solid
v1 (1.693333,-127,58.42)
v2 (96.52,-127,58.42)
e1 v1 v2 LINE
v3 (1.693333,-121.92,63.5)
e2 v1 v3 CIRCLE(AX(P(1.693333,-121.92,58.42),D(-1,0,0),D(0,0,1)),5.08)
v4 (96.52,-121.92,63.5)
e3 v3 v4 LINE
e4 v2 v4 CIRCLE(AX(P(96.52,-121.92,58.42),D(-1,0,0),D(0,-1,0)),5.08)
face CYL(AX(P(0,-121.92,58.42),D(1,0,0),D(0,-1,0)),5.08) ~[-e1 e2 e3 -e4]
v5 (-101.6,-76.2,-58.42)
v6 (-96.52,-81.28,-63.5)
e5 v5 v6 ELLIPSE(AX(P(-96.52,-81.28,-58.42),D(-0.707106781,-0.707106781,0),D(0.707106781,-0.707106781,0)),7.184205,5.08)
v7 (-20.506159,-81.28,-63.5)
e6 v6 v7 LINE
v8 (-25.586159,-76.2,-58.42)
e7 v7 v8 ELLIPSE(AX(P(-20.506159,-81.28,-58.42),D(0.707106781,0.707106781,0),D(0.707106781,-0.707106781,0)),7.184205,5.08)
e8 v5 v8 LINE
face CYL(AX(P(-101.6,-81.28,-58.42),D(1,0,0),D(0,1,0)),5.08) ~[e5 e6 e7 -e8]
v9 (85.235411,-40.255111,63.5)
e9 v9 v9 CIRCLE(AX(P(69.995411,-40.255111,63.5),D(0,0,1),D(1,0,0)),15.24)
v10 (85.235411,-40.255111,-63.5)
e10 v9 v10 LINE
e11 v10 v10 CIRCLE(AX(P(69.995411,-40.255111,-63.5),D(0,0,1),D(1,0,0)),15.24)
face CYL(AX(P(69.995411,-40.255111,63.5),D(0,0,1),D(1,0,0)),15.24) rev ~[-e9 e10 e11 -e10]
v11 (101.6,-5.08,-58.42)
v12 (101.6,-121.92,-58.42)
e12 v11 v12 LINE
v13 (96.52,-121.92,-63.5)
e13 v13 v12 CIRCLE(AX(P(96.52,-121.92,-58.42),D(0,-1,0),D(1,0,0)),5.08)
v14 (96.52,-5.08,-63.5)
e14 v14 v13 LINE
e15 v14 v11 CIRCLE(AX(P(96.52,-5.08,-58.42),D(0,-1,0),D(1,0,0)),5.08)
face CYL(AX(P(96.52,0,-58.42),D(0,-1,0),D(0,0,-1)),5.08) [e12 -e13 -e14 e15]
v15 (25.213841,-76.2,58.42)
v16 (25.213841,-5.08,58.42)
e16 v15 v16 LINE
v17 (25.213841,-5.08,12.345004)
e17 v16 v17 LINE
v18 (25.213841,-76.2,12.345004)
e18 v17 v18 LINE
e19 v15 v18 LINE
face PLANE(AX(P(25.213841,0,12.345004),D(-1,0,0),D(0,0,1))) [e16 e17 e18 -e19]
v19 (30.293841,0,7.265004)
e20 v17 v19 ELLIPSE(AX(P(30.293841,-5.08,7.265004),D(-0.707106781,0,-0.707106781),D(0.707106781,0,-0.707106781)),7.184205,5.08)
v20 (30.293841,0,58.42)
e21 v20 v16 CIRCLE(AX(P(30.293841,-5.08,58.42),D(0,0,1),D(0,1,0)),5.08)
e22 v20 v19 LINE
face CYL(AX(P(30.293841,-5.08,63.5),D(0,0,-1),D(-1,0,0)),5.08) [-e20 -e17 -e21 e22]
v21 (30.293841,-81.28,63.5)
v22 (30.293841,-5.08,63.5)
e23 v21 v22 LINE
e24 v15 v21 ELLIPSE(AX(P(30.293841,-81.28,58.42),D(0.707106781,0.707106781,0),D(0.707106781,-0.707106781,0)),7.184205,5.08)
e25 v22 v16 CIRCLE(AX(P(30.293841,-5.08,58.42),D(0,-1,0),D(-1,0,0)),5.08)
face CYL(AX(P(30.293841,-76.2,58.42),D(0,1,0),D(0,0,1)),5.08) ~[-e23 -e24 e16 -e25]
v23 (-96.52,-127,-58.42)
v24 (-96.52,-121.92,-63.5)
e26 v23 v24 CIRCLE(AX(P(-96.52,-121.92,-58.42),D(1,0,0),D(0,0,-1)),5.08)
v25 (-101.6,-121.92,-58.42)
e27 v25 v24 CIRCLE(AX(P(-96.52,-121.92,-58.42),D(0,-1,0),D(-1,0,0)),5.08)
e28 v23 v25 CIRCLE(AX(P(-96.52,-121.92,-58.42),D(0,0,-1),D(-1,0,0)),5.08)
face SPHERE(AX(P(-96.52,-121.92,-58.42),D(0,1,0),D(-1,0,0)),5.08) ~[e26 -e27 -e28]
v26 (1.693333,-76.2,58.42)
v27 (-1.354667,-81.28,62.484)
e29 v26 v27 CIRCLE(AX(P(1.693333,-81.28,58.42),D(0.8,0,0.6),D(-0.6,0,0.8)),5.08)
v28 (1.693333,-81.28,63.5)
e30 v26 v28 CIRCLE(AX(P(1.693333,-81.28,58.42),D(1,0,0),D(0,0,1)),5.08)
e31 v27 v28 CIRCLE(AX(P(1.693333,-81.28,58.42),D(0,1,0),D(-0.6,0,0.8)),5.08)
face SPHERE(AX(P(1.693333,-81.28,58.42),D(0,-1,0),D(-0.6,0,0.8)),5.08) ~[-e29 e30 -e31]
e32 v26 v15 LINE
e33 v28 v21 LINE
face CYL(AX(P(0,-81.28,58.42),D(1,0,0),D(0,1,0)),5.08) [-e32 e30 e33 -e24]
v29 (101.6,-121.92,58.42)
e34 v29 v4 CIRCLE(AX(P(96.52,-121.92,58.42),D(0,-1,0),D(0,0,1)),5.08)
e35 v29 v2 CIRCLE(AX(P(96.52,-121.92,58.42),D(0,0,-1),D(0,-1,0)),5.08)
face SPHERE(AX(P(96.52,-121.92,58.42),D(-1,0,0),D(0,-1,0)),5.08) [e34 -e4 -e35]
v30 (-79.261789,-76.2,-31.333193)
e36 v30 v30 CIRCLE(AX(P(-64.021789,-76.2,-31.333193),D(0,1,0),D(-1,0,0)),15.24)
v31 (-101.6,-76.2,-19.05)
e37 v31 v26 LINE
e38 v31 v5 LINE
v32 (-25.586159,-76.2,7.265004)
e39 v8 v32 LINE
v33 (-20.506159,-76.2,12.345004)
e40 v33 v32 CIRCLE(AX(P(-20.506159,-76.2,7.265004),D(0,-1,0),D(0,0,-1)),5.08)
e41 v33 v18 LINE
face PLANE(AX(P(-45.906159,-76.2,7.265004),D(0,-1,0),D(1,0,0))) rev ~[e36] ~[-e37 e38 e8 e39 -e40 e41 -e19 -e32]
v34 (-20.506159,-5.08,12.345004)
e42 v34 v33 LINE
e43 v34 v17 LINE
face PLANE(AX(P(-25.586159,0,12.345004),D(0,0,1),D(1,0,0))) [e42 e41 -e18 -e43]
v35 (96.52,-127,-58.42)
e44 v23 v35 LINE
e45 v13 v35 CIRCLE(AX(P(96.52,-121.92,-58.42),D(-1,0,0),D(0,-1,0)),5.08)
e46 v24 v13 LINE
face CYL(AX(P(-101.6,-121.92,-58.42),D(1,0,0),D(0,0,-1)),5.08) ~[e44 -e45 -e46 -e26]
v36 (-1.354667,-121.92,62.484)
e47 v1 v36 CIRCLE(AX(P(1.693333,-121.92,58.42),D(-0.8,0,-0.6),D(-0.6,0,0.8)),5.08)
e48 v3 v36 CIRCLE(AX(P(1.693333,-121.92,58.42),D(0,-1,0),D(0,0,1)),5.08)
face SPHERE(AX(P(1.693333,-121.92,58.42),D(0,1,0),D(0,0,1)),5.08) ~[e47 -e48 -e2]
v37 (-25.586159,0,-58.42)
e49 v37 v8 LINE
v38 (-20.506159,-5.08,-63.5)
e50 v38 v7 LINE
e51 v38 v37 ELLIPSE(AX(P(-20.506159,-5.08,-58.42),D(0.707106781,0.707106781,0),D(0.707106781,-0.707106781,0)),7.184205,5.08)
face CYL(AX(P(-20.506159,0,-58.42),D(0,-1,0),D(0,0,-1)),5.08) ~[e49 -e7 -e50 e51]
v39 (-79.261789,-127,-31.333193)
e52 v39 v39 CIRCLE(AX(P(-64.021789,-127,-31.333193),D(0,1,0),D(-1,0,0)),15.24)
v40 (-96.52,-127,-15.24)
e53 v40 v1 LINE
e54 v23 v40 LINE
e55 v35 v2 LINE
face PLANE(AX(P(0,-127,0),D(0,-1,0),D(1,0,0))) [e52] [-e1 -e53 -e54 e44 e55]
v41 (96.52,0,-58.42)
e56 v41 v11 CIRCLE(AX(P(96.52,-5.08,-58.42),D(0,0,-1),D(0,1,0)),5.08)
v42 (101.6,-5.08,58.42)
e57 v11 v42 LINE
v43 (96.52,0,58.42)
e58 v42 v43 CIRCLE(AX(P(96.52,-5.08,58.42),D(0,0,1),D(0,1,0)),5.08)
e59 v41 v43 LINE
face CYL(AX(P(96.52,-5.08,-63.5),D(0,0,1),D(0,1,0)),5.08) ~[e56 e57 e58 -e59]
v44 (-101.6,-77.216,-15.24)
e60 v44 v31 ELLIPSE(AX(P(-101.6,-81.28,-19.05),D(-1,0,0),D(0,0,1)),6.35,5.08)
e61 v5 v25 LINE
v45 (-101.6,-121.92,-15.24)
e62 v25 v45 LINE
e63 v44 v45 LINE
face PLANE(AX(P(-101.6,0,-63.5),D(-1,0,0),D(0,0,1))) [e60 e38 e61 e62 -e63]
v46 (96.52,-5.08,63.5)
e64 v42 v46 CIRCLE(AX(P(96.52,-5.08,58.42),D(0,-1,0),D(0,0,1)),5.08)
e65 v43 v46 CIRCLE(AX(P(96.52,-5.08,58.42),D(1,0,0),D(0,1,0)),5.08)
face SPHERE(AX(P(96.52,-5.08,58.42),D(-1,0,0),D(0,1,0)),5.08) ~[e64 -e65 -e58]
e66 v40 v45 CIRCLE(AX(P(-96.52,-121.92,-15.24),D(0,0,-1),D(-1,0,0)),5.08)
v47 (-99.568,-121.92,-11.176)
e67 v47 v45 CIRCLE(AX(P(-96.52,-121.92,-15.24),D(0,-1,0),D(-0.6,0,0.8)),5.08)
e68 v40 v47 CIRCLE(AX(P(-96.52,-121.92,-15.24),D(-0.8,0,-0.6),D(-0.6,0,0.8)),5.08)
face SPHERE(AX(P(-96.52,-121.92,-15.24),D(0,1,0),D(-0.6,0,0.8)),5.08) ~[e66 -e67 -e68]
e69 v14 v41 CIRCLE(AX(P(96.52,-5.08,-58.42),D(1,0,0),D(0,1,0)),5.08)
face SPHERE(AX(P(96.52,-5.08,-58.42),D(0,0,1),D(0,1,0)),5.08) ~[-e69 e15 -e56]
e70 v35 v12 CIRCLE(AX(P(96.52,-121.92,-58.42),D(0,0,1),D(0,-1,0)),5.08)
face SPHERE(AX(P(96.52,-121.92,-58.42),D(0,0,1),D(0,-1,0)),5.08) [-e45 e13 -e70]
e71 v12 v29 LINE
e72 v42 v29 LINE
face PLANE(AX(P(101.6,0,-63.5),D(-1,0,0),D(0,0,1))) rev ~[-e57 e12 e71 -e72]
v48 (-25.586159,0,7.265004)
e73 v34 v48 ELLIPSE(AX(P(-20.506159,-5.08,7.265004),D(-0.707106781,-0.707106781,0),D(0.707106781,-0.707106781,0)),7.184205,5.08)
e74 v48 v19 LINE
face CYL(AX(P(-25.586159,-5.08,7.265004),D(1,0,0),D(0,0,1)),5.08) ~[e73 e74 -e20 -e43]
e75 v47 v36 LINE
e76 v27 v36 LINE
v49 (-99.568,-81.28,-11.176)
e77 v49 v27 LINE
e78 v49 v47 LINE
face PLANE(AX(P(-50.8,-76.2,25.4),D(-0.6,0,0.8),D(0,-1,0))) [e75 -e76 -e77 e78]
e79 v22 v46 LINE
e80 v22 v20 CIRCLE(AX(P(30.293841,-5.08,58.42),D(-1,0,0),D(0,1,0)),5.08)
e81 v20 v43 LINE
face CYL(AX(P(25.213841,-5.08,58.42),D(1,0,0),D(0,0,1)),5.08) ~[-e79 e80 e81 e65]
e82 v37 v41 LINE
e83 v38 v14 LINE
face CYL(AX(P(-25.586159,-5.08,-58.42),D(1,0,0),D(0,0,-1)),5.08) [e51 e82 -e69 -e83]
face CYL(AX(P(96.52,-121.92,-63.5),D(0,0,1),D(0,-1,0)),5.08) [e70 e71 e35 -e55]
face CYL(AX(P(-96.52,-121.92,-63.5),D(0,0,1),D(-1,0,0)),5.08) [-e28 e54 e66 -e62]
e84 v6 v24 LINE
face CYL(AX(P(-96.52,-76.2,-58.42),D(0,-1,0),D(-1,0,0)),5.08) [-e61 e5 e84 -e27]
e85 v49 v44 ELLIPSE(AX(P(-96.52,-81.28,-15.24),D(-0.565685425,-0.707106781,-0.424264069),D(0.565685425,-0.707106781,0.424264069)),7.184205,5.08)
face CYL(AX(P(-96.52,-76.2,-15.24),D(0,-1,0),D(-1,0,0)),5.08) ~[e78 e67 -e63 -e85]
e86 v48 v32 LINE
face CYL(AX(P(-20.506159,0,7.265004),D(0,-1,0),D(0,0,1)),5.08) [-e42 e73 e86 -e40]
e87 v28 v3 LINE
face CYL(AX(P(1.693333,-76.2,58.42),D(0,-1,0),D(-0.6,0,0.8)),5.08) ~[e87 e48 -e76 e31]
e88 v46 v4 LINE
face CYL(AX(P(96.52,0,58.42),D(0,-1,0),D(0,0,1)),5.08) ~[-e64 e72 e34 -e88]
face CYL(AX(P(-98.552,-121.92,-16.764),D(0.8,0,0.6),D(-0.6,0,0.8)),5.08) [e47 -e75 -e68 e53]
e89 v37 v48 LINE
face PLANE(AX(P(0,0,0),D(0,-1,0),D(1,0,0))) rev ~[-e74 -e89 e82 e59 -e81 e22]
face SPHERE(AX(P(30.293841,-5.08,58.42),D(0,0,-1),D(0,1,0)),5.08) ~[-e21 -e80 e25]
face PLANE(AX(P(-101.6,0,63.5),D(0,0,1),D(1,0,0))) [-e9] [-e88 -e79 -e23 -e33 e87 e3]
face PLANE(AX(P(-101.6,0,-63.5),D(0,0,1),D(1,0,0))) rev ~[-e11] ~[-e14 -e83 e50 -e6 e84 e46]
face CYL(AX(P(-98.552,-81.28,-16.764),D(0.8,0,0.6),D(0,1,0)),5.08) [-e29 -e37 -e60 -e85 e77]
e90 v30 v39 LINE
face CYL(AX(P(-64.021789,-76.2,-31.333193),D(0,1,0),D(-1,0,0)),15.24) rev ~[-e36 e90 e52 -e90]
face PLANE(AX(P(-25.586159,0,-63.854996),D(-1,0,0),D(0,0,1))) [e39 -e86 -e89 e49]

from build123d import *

# Parameters (mm, degrees)
F0_W          = 203.2
F0_H          = 127
F1_DEPTH      = 127
F3_DEPTH      = 76.2
F3_DEPTH_BACK = 76.2
F4_DEPTH      = 25.4
F5_SIZE2      = 101.6
F5_SIZE       = 76.2
F6_R          = 5.08
F7_R          = 15.24
F8_DEPTH      = 51.054
F9_R          = 15.24
F10_DEPTH     = 128.27


with BuildPart() as f1:
    # F0 (on Front) → F1 (new body)
    with BuildSketch(Plane.XZ):
        Rectangle(F0_W, F0_H)
    extrude(amount=F1_DEPTH)

    # F2 (on Front) → F3 (cut, two sides)
    with BuildSketch(Plane.XZ) as f3_sk:
        Polygon((25.2138410211, 63.1450035885), (-101.7861589789, 63.1450035885), (-101.7861589789, -63.8549964115), (-25.5861589789, -63.8549964115), (-25.5861589789, 12.3450035885), (25.2138410211, 12.3450035885), align=None)
    extrude(amount=-F3_DEPTH, mode=Mode.SUBTRACT)
    extrude(f3_sk.sketch, amount=F3_DEPTH_BACK, mode=Mode.SUBTRACT)

    # F4 (cut): a face of the model
    f4_faces = [f1.faces().sort_by_distance(p)[0] for p in [
        (-38.1930794895, -38.1, 63.1450035885),
    ]]
    extrude(f4_faces, amount=-F4_DEPTH, mode=Mode.SUBTRACT)

    # F5
    f5_edges = [f1.edges().sort_by_distance(p)[0] for p in [
        (-101.6, -101.6, 63.5),
    ]]
    f5_side = f1.faces().sort_by_distance((-101.6, -101.6, 0))[0]
    chamfer(f5_edges, length=F5_SIZE, length2=F5_SIZE2, reference=f5_side)

    # F6
    f6_edges = [f1.edges().sort_by_distance(p)[0] for p in [
        (25.213841, 0, 37.922502),
        (63.406921, 0, 63.5),
        (-0.186159, 0, 12.345004),
        (-25.586159, -38.1, 12.345004),
        (-101.6, -101.6, -12.7),
        (0, -101.6, 63.5),
        (101.6, 0, 0),
        (38.006921, 0, -63.5),
        (-25.586159, -38.1, -63.5),
        (-63.593079, -76.2, -63.5),
        (-101.6, -101.6, -63.5),
        (50.8, -127, 63.5),
        (-50.8, -127, 25.4),
        (101.6, -127, 0),
        (-101.6, -127, -38.1),
        (0, -127, -63.5),
        (-50.8, -76.2, 25.4),
        (101.6, -63.5, 63.5),
        (101.6, -63.5, -63.5),
        (12.606921, -76.2, 63.5),
        (25.213841, -38.1, 63.5),
    ]]
    fillet(f6_edges, radius=F6_R)

    # F7 (on face) → F8 (cut)
    with BuildSketch(Plane(origin=(0, -76.2, 0), x_dir=(-1, 0, 0), z_dir=(0, 1, 0))):
        with Locations((64.0217885375, -31.3331931829)):
            Circle(F7_R)
    extrude(amount=-F8_DEPTH, mode=Mode.SUBTRACT)

    # F9 (on face) → F10 (cut)
    with BuildSketch(Plane.XY.offset(63.5)):
        with Locations((69.9954107404, -40.2551107109)):
            Circle(F9_R)
    extrude(amount=-F10_DEPTH, mode=Mode.SUBTRACT)


solid = f1.part
